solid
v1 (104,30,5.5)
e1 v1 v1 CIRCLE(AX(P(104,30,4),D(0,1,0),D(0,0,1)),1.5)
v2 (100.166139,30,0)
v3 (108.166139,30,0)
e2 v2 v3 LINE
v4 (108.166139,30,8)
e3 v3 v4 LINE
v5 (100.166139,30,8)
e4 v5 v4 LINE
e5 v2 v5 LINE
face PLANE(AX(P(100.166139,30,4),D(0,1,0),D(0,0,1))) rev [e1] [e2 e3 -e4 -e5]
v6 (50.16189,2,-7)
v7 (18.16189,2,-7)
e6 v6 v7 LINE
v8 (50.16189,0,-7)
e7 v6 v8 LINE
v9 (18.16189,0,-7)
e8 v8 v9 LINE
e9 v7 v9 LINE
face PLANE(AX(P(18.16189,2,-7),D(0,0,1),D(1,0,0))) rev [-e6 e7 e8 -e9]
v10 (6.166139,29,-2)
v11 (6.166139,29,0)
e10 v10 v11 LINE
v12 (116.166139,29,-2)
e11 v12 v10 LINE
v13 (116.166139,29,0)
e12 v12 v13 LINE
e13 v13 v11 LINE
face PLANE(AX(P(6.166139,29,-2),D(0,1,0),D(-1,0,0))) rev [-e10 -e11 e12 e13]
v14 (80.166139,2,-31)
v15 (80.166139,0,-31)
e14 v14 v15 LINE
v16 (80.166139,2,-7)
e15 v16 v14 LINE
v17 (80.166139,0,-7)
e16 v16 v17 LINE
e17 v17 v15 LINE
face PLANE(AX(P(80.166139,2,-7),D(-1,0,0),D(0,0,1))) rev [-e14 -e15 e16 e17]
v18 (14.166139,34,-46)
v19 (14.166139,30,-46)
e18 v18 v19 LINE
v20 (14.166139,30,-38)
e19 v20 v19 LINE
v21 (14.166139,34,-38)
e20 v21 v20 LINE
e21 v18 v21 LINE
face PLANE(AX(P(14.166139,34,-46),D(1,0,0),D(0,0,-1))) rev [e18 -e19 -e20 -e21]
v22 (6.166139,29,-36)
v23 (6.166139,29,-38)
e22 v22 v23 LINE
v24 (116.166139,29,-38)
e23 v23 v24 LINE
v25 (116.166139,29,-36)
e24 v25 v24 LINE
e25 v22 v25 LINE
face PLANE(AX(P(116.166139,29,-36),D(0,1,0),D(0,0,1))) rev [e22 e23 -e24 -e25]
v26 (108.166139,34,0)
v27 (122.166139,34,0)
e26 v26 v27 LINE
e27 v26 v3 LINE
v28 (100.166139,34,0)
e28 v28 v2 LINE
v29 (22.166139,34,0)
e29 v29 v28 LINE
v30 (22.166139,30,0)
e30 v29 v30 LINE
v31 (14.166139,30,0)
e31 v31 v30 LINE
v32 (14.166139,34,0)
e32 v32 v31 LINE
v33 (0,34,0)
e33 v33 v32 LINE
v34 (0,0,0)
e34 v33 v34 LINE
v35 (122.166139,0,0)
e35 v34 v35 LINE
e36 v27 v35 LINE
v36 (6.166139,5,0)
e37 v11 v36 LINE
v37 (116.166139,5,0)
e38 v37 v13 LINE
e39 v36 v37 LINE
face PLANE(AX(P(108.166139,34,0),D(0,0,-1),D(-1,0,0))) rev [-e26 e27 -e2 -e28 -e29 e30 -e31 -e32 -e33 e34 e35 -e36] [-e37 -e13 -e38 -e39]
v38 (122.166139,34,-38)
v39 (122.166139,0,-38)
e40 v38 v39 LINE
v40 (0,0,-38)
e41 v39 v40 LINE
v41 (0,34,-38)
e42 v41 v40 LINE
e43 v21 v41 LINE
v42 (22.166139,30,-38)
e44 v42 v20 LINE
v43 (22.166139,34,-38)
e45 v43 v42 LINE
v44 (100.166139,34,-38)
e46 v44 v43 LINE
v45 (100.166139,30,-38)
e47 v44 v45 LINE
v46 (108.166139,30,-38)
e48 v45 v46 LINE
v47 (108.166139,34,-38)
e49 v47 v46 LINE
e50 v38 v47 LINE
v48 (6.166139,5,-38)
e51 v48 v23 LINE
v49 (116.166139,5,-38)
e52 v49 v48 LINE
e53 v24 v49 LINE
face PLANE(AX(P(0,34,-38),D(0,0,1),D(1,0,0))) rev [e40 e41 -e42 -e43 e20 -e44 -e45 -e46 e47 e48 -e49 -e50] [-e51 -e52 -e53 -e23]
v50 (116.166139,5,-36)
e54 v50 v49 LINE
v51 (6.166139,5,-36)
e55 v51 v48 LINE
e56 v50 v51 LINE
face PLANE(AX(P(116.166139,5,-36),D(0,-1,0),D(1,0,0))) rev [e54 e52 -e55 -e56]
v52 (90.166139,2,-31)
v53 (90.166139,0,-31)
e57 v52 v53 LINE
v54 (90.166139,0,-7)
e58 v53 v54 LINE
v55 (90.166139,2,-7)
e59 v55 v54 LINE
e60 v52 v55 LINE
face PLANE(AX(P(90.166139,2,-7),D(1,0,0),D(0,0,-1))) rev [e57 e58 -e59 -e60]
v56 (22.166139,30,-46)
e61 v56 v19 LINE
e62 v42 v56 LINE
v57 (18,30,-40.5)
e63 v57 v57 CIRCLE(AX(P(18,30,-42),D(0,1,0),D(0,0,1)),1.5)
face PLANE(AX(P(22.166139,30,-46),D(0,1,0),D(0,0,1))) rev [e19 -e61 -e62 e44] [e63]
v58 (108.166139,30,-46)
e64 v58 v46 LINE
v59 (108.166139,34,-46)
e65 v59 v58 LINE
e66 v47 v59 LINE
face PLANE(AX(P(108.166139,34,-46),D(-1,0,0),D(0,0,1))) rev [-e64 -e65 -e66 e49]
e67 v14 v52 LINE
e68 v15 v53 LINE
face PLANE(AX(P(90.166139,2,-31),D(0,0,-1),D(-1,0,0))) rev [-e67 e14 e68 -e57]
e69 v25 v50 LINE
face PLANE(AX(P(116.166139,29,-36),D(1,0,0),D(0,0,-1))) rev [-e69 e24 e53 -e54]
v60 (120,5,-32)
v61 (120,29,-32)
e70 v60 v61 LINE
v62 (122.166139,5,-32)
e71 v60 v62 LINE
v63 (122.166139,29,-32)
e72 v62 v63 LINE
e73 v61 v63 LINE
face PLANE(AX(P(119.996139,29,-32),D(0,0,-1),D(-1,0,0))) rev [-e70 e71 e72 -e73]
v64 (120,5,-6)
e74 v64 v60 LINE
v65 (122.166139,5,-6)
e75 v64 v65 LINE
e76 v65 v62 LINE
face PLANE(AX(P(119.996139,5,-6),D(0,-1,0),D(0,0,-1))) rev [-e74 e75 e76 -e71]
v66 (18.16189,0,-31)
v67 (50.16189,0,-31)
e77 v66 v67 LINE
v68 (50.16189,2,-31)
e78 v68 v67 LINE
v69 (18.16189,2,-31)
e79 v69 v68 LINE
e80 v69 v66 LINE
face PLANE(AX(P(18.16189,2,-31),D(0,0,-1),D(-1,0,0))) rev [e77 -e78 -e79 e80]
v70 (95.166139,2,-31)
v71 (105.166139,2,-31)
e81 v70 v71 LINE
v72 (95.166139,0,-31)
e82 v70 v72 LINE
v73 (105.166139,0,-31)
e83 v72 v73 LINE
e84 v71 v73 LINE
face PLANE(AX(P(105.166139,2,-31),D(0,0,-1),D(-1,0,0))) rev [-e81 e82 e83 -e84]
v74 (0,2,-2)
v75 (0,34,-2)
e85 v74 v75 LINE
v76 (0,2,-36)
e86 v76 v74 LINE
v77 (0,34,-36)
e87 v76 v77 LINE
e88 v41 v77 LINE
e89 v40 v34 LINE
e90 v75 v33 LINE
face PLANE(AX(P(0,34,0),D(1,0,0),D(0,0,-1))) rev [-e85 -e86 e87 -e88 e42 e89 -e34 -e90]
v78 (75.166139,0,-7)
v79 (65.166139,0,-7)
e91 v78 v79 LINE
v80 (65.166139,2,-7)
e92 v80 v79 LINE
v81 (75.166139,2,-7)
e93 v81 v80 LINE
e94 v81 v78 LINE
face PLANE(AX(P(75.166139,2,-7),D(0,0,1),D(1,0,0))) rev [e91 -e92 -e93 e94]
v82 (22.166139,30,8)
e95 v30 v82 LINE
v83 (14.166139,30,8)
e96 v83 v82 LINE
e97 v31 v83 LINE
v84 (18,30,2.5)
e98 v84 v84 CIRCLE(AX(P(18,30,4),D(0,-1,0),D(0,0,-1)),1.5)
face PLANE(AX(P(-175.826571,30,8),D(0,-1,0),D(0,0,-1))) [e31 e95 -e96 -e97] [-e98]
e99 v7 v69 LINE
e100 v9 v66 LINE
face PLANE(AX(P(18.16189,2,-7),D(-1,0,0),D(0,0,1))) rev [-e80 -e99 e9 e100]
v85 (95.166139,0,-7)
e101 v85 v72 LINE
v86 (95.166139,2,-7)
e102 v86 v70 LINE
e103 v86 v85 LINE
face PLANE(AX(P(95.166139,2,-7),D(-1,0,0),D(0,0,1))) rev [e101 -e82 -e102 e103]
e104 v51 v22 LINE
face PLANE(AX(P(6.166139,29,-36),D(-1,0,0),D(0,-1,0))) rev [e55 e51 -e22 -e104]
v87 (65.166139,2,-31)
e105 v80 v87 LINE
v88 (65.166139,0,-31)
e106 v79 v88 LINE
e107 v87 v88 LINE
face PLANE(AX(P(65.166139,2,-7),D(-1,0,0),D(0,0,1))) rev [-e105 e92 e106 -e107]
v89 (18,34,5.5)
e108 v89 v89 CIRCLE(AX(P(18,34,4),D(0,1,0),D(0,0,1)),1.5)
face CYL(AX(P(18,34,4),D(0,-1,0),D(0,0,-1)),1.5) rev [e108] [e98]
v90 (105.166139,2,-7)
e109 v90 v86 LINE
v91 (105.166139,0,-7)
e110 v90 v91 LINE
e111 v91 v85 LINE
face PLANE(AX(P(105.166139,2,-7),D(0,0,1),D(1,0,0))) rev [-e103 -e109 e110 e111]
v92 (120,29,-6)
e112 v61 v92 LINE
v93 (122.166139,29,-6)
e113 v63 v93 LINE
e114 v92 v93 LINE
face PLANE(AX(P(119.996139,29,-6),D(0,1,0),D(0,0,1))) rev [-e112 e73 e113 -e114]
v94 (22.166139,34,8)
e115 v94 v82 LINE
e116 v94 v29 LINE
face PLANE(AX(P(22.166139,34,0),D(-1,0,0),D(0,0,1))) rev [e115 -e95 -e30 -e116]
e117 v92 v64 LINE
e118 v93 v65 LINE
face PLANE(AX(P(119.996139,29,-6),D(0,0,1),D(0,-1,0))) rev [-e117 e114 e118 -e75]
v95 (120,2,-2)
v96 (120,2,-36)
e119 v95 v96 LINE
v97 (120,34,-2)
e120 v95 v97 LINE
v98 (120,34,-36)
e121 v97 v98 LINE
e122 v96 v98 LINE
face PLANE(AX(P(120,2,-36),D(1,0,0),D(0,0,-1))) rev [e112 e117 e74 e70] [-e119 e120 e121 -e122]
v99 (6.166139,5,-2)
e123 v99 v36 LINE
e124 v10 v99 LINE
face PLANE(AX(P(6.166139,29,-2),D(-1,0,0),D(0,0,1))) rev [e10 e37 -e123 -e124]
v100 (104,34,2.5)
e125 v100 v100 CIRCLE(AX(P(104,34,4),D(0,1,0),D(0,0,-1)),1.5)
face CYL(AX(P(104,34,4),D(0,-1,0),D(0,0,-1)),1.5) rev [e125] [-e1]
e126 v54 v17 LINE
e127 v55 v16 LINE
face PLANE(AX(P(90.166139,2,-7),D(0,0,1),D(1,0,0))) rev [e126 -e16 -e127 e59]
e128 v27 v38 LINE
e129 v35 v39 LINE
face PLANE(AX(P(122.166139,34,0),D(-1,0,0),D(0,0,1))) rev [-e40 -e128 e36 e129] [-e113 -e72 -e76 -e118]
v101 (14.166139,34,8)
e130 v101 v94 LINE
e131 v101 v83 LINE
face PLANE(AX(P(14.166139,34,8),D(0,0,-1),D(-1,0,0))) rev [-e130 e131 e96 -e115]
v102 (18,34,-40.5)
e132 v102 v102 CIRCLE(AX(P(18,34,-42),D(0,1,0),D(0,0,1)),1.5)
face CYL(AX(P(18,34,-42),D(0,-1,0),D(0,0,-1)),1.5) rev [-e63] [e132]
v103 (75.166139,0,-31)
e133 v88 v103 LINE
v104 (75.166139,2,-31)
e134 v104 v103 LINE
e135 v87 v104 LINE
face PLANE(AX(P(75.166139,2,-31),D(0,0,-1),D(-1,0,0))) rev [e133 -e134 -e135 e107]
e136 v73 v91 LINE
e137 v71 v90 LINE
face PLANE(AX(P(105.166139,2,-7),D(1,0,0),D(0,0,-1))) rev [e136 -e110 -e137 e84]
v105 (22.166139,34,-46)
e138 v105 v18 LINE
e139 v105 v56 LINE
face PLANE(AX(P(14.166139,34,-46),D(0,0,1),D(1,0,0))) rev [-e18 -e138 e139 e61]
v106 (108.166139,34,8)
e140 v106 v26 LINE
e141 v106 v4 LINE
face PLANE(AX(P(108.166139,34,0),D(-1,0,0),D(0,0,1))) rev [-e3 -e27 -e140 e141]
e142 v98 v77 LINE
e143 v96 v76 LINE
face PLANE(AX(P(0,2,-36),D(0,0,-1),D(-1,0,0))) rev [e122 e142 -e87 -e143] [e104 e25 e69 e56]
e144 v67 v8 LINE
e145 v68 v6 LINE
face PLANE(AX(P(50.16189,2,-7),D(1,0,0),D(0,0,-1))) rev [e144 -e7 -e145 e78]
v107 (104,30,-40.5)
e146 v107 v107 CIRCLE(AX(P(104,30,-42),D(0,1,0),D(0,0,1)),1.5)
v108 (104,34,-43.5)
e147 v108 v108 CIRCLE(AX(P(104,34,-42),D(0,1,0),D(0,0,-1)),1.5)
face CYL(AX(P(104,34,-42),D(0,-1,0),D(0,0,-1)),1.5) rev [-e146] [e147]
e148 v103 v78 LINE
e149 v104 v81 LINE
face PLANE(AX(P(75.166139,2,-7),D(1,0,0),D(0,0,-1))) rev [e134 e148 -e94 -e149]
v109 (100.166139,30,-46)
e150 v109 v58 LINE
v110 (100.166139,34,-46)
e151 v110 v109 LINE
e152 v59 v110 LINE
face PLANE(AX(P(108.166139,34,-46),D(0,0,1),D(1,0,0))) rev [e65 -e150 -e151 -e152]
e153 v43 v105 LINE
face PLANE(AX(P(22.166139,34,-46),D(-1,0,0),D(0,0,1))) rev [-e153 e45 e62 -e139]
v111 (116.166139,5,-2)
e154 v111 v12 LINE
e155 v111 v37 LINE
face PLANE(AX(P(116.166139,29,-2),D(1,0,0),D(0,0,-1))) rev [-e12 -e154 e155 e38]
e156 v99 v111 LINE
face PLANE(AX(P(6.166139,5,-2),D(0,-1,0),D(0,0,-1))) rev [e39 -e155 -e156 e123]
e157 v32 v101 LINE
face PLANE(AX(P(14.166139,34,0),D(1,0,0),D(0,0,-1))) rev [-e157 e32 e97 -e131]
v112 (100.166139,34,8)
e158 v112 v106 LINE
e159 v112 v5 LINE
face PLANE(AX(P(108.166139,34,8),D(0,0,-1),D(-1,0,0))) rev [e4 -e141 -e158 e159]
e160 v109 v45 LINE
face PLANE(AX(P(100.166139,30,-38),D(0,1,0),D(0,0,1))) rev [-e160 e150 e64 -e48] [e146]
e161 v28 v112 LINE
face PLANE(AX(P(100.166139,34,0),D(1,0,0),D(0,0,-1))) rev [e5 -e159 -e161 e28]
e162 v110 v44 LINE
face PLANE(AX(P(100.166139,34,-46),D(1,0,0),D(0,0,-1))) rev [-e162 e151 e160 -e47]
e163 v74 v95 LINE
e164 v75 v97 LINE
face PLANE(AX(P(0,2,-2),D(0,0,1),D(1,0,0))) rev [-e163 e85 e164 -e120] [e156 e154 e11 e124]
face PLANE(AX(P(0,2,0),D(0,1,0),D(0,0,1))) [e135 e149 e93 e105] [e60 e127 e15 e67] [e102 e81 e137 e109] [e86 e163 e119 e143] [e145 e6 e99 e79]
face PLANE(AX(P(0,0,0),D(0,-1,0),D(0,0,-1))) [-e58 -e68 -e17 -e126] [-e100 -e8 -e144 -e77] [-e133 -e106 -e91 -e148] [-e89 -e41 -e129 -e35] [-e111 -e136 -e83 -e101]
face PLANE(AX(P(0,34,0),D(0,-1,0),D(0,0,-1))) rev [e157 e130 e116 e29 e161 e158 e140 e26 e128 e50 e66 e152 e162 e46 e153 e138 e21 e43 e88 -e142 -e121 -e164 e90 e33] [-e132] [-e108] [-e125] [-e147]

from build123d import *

# Parameters (mm, degrees)
SKETCH1_R              = 1.5
BOSS_EXTRUDE2_DEPTH    = 34
SKETCH3_W              = 120
SKETCH3_H              = 34
CUT_EXTRUDE1_DEPTH     = 32
CUT_EXTRUDE4_START     = -8
CUT_EXTRUDE4_OUTLINE_W = 8
CUT_EXTRUDE4_OUTLINE_H = 30
CUT_EXTRUDE4_DEPTH     = 8
CUT_EXTRUDE5_DEPTH     = 8
SKETCH8_W              = 8
SKETCH8_H              = 30
CUT_EXTRUDE6_DEPTH     = 8
SKETCH9_W              = 8
SKETCH9_H              = 30
CUT_EXTRUDE7_DEPTH     = 8
SKETCH10_W             = 110
SKETCH10_H             = 24
CUT_EXTRUDE8_DEPTH     = 2
SKETCH11_W             = 110
SKETCH11_H             = 24
CUT_EXTRUDE9_DEPTH     = 2
SKETCH12_W             = 26
SKETCH12_H             = 24
CUT_EXTRUDE11_DEPTH    = 2.17
SKETCH13_W             = 10
SKETCH13_H             = 24
SKETCH13_W_2           = 32
CUT_EXTRUDE12_DEPTH    = 2


# Read off the part's stored shape, not the designer's step: Cut-Extrude4
with BuildPart() as part:
    # Sketch1 → Boss-Extrude2 (new body)
    with BuildSketch(Plane(origin=(0, 0, 0), x_dir=(1, 0, 0), z_dir=(0, 1, 0))):
        Polygon((0, 0), (14.166139068, 0), (14.166139068, -8), (22.166139068, -8), (22.166139068, 0), (100.166139068, 0), (100.166139068, -8), (108.166139068, -8), (108.166139068, 0), (122.166139068, 0), (122.166139068, 38), (108.166139068, 38), (108.166139068, 46), (100.166139068, 46), (100.166139068, 38), (22.166139068, 38), (22.166139068, 46), (14.166139068, 46), (14.166139068, 38), (0, 38), align=None)
        with Locations(Location((18, 42, 0), (0, 0, 270))):
            Circle(SKETCH1_R, mode=Mode.SUBTRACT)
        with Locations(Location((18, -4, 0), (0, 0, 270))):
            Circle(SKETCH1_R, mode=Mode.SUBTRACT)
        with Locations(Location((104, -4, 0), (0, 0, 90))):
            Circle(SKETCH1_R, mode=Mode.SUBTRACT)
        with Locations(Location((104, 42, 0), (0, 0, 90))):
            Circle(SKETCH1_R, mode=Mode.SUBTRACT)
    extrude(amount=BOSS_EXTRUDE2_DEPTH)

    # Sketch3 → Cut-Extrude1 (cut)
    with BuildSketch(Plane(origin=(0, 34, 0), x_dir=(1, 0, 0), z_dir=(0, 1, 0))):
        with Locations((60, 19)):
            Rectangle(SKETCH3_W, SKETCH3_H)
    extrude(amount=-CUT_EXTRUDE1_DEPTH, mode=Mode.SUBTRACT)

    # Cut-Extrude4 outline → Cut-Extrude4 (cut)
    with BuildSketch(Plane.ZY.offset(-14.166139068).offset(CUT_EXTRUDE4_START)):
        with Locations((4, 15)):
            Rectangle(CUT_EXTRUDE4_OUTLINE_W, CUT_EXTRUDE4_OUTLINE_H)
    extrude(amount=CUT_EXTRUDE4_DEPTH, mode=Mode.SUBTRACT)

    # Sketch7 → Cut-Extrude5 (cut)
    with BuildSketch(Plane(origin=(108.166139068, 0, 0), x_dir=(0, 0, -1), z_dir=(1, 0, 0))):
        Polygon((-4, 30), (0, 30), (0, 0), (-8, 0), (-8, 30), align=None)
    extrude(amount=-CUT_EXTRUDE5_DEPTH, mode=Mode.SUBTRACT)

    # Sketch8 → Cut-Extrude6 (cut)
    with BuildSketch(Plane(origin=(108.166139068, 0, 0), x_dir=(0, 0, -1), z_dir=(1, 0, 0))):
        with Locations((42, 15)):
            Rectangle(SKETCH8_W, SKETCH8_H)
    extrude(amount=-CUT_EXTRUDE6_DEPTH, mode=Mode.SUBTRACT)

    # Sketch9 → Cut-Extrude7 (cut)
    with BuildSketch(Plane.ZY.offset(-14.166139068)):
        with Locations((-42, 15)):
            Rectangle(SKETCH9_W, SKETCH9_H)
    extrude(amount=-CUT_EXTRUDE7_DEPTH, mode=Mode.SUBTRACT)

    # Sketch10 → Cut-Extrude8 (cut)
    with BuildSketch(Plane(origin=(0, 0, -38), x_dir=(-1, 0, 0), z_dir=(0, 0, -1))):
        with Locations((-61.166139068, 17)):
            Rectangle(SKETCH10_W, SKETCH10_H)
    extrude(amount=-CUT_EXTRUDE8_DEPTH, mode=Mode.SUBTRACT)

    # Sketch11 → Cut-Extrude9 (cut)
    with BuildSketch(Plane.XY):
        with Locations((61.166139068, 17)):
            Rectangle(SKETCH11_W, SKETCH11_H)
    extrude(amount=-CUT_EXTRUDE9_DEPTH, mode=Mode.SUBTRACT)

    # Sketch12 → Cut-Extrude11 (cut)
    with BuildSketch(Plane(origin=(122.166139068, 0, 0), x_dir=(0, 0, -1), z_dir=(1, 0, 0))):
        with Locations((19, 17)):
            Rectangle(SKETCH12_W, SKETCH12_H)
    extrude(amount=-CUT_EXTRUDE11_DEPTH, mode=Mode.SUBTRACT)

    # Sketch13 → Cut-Extrude12 (cut)
    with BuildSketch(Plane.XZ):
        with Locations((100.166139068, -19)):
            Rectangle(SKETCH13_W, SKETCH13_H)
        with Locations((85.166139068, -19)):
            Rectangle(SKETCH13_W, SKETCH13_H)
        with Locations((70.166139068, -19)):
            Rectangle(SKETCH13_W, SKETCH13_H)
        with Locations((34.16188968, -19)):
            Rectangle(SKETCH13_W_2, SKETCH13_H)
    extrude(amount=-CUT_EXTRUDE12_DEPTH, mode=Mode.SUBTRACT)


solid = part.part
